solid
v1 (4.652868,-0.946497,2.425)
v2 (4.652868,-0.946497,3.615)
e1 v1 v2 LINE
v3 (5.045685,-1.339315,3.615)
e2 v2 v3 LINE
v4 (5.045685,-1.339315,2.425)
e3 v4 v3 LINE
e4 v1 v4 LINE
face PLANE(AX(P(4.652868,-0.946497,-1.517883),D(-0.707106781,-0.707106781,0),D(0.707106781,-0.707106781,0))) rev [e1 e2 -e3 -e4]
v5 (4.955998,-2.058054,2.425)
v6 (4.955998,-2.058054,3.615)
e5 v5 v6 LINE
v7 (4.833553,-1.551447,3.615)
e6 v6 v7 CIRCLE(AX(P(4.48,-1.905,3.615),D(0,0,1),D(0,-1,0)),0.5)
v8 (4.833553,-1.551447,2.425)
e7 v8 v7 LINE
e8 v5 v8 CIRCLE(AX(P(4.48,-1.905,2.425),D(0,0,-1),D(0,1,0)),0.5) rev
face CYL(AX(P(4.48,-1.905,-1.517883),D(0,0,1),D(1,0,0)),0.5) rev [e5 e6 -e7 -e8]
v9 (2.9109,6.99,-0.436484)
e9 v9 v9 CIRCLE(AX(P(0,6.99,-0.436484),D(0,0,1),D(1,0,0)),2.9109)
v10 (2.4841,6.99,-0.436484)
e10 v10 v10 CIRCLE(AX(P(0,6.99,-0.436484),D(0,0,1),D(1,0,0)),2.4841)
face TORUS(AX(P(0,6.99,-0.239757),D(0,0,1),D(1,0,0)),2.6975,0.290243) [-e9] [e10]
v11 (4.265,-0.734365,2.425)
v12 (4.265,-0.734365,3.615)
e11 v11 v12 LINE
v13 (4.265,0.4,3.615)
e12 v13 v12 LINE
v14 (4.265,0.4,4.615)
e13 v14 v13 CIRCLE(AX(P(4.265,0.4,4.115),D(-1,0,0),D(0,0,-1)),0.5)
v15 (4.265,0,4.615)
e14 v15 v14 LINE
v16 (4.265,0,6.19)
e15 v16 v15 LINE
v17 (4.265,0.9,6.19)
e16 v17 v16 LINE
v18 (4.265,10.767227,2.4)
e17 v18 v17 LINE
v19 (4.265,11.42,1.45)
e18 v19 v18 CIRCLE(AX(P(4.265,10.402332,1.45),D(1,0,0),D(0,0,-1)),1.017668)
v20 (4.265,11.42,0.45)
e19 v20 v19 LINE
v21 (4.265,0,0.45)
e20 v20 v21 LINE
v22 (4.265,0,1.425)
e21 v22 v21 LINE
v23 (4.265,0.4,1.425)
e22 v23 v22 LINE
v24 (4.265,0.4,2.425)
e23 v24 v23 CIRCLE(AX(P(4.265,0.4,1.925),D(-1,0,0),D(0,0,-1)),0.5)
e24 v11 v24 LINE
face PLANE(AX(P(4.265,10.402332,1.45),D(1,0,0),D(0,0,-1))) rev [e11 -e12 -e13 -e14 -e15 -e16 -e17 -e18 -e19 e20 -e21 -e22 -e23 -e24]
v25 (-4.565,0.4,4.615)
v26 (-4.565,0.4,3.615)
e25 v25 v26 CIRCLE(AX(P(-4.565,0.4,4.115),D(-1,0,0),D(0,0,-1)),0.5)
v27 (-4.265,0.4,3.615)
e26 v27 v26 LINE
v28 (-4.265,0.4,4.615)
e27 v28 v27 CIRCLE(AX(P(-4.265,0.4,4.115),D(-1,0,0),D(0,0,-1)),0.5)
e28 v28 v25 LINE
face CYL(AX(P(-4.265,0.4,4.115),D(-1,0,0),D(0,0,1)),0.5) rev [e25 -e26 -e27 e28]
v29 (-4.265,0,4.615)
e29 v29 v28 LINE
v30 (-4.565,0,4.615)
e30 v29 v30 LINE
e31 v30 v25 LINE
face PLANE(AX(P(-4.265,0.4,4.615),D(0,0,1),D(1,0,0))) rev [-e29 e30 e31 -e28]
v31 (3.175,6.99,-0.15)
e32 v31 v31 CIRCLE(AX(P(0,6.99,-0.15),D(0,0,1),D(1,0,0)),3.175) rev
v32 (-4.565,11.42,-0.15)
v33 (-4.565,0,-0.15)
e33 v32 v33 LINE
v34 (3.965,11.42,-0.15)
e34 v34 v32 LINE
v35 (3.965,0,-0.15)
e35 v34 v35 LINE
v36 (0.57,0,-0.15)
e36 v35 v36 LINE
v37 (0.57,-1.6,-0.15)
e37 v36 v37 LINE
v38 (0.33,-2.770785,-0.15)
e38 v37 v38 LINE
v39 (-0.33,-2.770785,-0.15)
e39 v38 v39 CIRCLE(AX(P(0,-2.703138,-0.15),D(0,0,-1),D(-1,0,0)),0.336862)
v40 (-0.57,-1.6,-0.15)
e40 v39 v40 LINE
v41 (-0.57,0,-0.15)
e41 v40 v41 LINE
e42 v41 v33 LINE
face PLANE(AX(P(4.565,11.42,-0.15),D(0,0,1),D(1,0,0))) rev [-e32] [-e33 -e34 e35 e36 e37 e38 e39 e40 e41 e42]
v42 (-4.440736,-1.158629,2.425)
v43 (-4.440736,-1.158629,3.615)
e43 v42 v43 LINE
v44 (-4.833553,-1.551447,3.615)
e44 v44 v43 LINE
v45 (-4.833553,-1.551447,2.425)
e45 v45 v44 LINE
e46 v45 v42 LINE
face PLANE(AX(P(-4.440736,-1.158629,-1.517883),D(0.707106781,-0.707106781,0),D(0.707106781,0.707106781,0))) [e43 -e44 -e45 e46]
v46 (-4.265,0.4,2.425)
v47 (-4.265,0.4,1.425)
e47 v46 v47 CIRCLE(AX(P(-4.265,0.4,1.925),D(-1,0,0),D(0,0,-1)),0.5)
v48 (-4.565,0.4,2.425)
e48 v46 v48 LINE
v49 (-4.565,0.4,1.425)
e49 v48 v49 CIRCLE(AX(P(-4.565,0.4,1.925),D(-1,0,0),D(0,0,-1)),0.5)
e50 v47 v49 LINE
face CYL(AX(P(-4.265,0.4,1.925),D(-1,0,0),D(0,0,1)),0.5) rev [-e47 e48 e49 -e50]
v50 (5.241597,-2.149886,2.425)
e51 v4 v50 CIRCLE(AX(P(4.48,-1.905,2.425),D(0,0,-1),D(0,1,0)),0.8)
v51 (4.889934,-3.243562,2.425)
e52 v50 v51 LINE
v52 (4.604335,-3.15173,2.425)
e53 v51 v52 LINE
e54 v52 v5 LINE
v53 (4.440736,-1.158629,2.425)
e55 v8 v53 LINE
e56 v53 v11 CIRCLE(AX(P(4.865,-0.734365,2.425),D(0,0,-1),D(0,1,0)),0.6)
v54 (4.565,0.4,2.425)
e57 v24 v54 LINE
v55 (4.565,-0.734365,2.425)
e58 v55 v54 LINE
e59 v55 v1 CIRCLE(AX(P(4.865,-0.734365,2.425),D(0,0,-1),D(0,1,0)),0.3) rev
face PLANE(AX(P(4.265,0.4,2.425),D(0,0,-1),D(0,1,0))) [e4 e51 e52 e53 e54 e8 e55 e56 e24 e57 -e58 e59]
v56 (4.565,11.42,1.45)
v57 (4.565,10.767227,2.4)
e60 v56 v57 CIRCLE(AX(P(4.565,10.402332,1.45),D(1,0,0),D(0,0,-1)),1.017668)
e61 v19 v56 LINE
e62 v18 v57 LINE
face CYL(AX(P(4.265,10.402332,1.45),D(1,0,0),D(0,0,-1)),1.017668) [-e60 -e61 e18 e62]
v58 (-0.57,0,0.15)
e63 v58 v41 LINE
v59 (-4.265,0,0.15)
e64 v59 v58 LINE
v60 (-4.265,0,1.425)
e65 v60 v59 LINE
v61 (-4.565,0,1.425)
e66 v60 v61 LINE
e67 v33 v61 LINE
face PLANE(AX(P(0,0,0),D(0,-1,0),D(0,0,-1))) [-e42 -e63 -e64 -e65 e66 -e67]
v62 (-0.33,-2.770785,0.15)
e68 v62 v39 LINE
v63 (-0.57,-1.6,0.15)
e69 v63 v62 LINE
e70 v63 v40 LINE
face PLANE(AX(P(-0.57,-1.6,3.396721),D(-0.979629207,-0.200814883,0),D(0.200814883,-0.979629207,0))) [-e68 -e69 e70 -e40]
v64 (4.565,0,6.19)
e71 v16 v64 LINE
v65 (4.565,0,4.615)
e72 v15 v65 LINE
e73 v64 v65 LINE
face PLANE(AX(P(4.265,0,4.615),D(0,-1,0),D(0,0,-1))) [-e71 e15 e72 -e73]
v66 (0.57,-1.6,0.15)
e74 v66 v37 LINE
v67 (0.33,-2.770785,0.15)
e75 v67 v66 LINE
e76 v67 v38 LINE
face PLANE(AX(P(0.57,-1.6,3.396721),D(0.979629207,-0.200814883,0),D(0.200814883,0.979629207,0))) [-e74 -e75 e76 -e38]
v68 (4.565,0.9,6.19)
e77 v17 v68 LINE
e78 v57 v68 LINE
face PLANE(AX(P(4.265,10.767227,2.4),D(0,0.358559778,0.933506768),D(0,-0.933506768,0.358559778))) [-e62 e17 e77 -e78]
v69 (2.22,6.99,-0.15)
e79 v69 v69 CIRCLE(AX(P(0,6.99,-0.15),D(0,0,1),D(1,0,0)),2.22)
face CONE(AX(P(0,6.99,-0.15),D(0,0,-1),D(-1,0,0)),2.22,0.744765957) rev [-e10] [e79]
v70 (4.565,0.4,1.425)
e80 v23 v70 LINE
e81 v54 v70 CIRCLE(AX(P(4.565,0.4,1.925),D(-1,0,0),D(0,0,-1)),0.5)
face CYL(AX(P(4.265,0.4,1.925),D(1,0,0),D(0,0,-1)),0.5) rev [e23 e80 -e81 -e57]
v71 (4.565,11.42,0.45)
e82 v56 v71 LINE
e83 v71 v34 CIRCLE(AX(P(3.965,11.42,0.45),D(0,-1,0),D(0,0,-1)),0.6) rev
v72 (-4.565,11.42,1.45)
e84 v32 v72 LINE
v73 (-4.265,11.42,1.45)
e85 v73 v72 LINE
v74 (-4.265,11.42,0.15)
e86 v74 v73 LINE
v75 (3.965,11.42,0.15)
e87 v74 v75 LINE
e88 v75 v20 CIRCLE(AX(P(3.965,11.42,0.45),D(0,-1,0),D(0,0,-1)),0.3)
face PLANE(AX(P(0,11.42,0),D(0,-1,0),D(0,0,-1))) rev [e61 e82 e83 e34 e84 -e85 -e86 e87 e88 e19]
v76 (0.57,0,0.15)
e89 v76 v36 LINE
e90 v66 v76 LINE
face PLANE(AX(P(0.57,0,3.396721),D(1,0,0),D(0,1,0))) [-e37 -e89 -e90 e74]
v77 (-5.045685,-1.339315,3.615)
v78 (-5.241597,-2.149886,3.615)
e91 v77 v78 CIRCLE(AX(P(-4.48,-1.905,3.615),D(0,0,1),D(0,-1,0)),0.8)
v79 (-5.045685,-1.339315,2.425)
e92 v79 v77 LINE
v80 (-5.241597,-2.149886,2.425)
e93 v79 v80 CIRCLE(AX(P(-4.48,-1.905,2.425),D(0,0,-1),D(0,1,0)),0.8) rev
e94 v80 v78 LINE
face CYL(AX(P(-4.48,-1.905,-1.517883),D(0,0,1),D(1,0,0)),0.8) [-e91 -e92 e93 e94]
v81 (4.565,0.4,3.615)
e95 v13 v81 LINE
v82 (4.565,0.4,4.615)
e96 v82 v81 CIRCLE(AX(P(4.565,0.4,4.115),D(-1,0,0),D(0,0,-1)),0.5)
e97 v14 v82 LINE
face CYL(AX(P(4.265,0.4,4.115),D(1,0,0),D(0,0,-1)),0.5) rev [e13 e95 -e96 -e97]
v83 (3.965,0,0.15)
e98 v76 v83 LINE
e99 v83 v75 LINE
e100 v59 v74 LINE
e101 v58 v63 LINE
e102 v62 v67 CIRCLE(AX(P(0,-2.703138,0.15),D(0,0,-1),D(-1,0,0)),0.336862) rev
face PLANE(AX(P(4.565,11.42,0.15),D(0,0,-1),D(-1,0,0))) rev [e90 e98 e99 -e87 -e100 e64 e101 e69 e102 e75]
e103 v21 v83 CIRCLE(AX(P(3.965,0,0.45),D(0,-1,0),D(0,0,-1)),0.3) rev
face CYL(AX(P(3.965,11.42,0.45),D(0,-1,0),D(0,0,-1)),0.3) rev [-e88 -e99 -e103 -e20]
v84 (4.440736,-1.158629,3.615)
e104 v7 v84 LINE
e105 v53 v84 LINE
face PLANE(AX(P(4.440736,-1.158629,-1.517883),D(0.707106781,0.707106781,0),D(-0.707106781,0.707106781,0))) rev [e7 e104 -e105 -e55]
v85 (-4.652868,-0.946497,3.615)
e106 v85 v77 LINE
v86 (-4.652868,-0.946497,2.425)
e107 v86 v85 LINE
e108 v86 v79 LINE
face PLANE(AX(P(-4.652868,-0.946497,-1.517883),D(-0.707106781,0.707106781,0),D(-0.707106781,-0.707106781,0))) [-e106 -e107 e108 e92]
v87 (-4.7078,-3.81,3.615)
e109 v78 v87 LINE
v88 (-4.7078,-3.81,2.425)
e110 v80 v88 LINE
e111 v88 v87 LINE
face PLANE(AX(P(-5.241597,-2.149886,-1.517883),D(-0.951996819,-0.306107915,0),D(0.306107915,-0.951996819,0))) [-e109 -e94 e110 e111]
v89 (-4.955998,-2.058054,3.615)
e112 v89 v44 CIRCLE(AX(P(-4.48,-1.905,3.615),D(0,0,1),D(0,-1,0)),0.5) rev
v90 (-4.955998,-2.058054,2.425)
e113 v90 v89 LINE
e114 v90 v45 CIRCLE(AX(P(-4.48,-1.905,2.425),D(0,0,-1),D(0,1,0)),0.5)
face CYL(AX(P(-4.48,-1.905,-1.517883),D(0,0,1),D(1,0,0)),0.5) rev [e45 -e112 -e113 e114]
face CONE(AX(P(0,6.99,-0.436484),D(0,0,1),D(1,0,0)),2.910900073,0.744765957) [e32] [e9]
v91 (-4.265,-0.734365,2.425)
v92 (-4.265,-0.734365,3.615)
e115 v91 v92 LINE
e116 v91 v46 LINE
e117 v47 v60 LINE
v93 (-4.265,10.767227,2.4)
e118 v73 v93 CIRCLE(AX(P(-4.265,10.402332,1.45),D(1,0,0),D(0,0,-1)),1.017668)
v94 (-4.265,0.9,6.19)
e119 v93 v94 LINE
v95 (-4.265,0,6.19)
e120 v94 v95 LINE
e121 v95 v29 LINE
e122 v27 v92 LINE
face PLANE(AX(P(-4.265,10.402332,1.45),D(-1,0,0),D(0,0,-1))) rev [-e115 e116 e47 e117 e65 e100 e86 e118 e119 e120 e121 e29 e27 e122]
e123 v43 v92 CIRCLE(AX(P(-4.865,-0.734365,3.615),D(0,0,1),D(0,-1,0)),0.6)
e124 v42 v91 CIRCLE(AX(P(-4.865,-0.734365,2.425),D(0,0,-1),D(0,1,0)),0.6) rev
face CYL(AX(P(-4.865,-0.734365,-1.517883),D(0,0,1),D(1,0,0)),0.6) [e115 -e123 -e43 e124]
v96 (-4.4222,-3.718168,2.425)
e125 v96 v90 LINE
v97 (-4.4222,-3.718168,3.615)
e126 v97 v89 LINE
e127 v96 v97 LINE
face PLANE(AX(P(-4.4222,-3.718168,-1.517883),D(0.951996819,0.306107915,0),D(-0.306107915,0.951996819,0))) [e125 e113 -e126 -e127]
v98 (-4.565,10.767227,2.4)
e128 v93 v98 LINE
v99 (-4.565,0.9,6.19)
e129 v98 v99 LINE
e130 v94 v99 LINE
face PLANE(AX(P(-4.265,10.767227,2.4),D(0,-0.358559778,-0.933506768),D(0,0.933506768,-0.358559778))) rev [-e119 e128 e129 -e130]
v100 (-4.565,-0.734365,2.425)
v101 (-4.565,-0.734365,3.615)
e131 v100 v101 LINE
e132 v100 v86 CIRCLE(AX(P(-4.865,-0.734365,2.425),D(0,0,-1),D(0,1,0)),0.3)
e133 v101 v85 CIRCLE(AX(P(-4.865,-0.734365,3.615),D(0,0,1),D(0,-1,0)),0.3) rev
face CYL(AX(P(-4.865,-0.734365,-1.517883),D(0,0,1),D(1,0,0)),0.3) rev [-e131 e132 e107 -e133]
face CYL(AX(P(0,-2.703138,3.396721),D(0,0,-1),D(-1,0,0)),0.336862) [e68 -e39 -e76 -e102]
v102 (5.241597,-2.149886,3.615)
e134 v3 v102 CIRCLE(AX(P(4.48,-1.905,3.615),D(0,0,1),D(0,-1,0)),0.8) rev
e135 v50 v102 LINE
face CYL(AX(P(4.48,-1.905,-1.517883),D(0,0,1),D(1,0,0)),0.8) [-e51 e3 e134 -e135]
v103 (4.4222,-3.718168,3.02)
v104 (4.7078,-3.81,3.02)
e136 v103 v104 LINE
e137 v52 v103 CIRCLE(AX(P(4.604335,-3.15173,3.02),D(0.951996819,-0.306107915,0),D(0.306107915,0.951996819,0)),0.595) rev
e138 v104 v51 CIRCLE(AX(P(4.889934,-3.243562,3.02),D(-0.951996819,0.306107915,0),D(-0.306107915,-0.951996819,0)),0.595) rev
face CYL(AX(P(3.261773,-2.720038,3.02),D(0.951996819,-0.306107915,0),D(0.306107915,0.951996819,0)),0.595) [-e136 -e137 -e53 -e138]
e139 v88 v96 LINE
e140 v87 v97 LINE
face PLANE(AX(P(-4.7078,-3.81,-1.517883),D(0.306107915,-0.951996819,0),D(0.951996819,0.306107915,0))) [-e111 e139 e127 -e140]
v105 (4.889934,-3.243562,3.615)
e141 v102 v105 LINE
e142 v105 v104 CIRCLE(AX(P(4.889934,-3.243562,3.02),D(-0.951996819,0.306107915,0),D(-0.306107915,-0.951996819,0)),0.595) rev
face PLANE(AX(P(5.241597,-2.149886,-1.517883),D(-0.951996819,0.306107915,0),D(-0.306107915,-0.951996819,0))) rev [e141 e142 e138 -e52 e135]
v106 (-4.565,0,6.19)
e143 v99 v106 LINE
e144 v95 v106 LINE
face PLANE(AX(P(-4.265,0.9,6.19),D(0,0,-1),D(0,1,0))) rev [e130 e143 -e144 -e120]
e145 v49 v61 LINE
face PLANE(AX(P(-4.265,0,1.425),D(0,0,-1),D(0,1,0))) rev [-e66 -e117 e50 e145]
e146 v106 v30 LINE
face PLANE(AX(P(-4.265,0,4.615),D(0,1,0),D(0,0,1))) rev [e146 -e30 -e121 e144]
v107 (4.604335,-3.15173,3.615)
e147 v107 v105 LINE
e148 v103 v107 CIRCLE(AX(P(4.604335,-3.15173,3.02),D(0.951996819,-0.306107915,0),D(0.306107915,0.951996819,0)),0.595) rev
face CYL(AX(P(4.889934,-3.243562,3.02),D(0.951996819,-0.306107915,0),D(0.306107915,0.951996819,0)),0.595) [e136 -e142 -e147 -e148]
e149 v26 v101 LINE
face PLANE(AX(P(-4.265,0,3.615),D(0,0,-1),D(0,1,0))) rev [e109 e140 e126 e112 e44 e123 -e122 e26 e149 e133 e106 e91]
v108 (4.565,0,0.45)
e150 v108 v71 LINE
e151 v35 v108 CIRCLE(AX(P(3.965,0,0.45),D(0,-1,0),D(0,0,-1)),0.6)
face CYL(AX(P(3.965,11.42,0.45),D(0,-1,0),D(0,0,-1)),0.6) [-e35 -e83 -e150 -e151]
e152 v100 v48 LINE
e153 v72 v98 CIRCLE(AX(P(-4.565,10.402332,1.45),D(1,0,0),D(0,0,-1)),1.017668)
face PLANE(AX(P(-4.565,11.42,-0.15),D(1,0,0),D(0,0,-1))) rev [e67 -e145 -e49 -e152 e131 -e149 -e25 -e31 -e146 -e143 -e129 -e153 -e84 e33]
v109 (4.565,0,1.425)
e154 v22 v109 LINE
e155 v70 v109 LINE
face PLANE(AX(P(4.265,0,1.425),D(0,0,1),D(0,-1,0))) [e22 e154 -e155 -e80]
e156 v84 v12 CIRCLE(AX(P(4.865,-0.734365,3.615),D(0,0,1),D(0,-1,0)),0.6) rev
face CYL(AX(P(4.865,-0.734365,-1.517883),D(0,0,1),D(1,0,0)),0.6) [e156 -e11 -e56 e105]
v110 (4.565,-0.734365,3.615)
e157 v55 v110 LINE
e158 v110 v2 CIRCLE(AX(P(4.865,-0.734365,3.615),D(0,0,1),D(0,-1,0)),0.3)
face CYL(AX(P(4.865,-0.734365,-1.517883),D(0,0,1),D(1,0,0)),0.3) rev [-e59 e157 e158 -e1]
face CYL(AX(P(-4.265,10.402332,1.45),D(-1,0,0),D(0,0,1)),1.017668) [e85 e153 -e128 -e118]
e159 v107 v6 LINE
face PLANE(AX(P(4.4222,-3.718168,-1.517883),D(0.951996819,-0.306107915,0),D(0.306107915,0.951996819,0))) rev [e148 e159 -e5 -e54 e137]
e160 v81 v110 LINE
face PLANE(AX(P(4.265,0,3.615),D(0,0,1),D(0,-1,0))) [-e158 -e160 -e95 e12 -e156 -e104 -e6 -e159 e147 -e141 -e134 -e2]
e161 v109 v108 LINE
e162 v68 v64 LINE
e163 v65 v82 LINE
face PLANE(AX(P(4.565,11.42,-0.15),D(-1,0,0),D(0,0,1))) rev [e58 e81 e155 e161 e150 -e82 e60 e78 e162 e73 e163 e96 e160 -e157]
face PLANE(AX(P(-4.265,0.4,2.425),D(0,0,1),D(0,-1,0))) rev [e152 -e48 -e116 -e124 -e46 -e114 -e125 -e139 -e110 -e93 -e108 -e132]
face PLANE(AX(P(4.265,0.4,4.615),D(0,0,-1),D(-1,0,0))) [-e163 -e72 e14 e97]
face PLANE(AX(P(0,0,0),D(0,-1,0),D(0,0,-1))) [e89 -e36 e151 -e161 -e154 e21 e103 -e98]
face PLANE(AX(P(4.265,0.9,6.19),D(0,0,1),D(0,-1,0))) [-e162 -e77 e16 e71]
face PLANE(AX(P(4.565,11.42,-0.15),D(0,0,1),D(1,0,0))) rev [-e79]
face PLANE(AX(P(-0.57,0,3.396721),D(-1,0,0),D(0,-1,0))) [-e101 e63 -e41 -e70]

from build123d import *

# Parameters (mm, degrees)
SKETCH1_W                       = 9.13
SKETCH1_H                       = 0.3
BOSS_EXTRUDE1_DEPTH             = 11.42
BOSS_EXTRUDE3_DEPTH             = 0.3
BOSS_EXTRUDE4_DEPTH             = 0.3
FILLET2_R                       = 0.3
FILLET3_R                       = 0.6
BOSS_EXTRUDE5_REACH             = 14.701
BOSS_EXTRUDE5_DIRECTION_2_REACH = 14.701
FILLET4_R                       = 0.595


with BuildPart() as part:
    # Sketch1 → Boss-Extrude1 (new body)
    with BuildSketch(Plane(origin=(0, 0, 0), x_dir=(1, 0, 0), z_dir=(0, 1, 0))):
        Rectangle(SKETCH1_W, SKETCH1_H)
    extrude(amount=BOSS_EXTRUDE1_DEPTH)

    # Sketch3 → Boss-Extrude3 (add)
    with BuildSketch(Plane(origin=(0, 0, -0.15), x_dir=(-1, 0, 0), z_dir=(0, 0, -1))):
        with BuildLine():
            Line((-0.57, 0), (0.57, 0))
            Line((0.57, 0), (0.57, -1.6))
            Line((0.57, -1.6), (0.33, -2.770784784))
            ThreePointArc((0.33, -2.770784784), (0, -3.04), (-0.33, -2.770784784))
            Line((-0.33, -2.770784784), (-0.57, -1.6))
            Line((-0.57, -1.6), (-0.57, 0))
        make_face()
    extrude(amount=-BOSS_EXTRUDE3_DEPTH)

    # Sketch4 → Boss-Extrude4 (add)
    with BuildSketch(Plane(origin=(4.565, 0, 0), x_dir=(0, 0, -1), z_dir=(1, 0, 0))):
        with BuildLine():
            Line((-0.15, 11.42), (-0.15, 0))
            Line((-0.15, 0), (-1.425, 0))
            Line((-1.425, 0), (-1.425, 0.4))
            ThreePointArc((-1.425, 0.4), (-1.925, 0.9), (-2.425, 0.4))
            Line((-2.425, 0.4), (-2.425, 0))
            Line((-2.425, 0), (-3.615, 0))
            Line((-3.615, 0), (-3.615, 0.4))
            ThreePointArc((-3.615, 0.4), (-4.115, 0.9), (-4.615, 0.4))
            Line((-4.615, 0.4), (-4.615, 0))
            Line((-4.615, 0), (-6.19, 0))
            Line((-6.19, 0), (-6.19, 0.9))
            Line((-6.19, 0.9), (-2.4, 10.767226789))
            ThreePointArc((-2.4, 10.767226789), (-2.026327352, 11.241078061), (-1.45, 11.42))
            Line((-1.45, 11.42), (-0.15, 11.42))
        make_face()
    boss_extrude4 = extrude(amount=-BOSS_EXTRUDE4_DEPTH)

    # Fillet2
    fillet2_edges = [part.edges().sort_by_distance(p)[0] for p in [
        (4.265, 5.71, 0.15),
    ]]
    fillet(fillet2_edges, radius=FILLET2_R)

    # Fillet3
    fillet3_edges = [part.edges().sort_by_distance(p)[0] for p in [
        (4.565, 5.71, -0.15),
    ]]
    fillet(fillet3_edges, radius=FILLET3_R)

    # Boss-Extrude5: up to this face of the body (flat: up to its plane)
    boss_extrude5_end = Plane(part.part.faces().sort_by_distance((4.415, 0.2, 2.425))[0])
    # Sketch5 → Boss-Extrude5 (add, up to the picked face)
    with BuildSketch(Plane(origin=(0, 0, 3.02), x_dir=(-1, 0, 0), z_dir=(0, 0, -1)), mode=Mode.PRIVATE) as boss_extrude5_sk1:
        with BuildLine():
            Line((-4.565, 0), (-4.265, 0))
            Line((-4.265, 0), (-4.265, -0.734365081))
            ThreePointArc((-4.265, -0.734365081), (-4.31067228, -0.963975141), (-4.440735931, -1.15862915))
            Line((-4.440735931, -1.15862915), (-4.833553391, -1.551446609))
            ThreePointArc((-4.833553391, -1.551446609), (-4.966005966, -1.787534255), (-4.95599841, -2.058053958))
            Line((-4.95599841, -2.058053958), (-4.422200477, -3.718167625))
            Line((-4.422200477, -3.718167625), (-4.707799523, -3.81))
            Line((-4.707799523, -3.81), (-5.241597456, -2.149886332))
            ThreePointArc((-5.241597456, -2.149886332), (-5.257609545, -1.717054807), (-5.045685425, -1.339314575))
            Line((-5.045685425, -1.339314575), (-4.652867966, -0.946497116))
            ThreePointArc((-4.652867966, -0.946497116), (-4.58783614, -0.849170111), (-4.565, -0.734365081))
            Line((-4.565, -0.734365081), (-4.565, 0))
        make_face()
    boss_extrude5_tool1 = split(extrude(boss_extrude5_sk1.sketch, amount=BOSS_EXTRUDE5_REACH, mode=Mode.PRIVATE), bisect_by=boss_extrude5_end, keep=Keep.BOTH, mode=Mode.PRIVATE)
    boss_extrude5 = boss_extrude5_tool1.solids().sort_by(Axis((4.415, -0.039429, 3.02), (0, 0, -1)))[0]
    add(boss_extrude5)

    # Boss-Extrude5 direction 2: up to this face of the body (flat: up to its plane)
    boss_extrude5_direction_2_end = Plane(part.part.faces().sort_by_distance((4.415, 0.2, 3.615))[0])
    # Sketch5 → Boss-Extrude5 direction 2 (add, up to the picked face)
    with BuildSketch(Plane(origin=(0, 0, 3.02), x_dir=(-1, 0, 0), z_dir=(0, 0, -1)), mode=Mode.PRIVATE) as boss_extrude5_direction_2_sk1:
        with BuildLine():
            Line((-4.565, 0), (-4.265, 0))
            Line((-4.265, 0), (-4.265, -0.734365081))
            ThreePointArc((-4.265, -0.734365081), (-4.31067228, -0.963975141), (-4.440735931, -1.15862915))
            Line((-4.440735931, -1.15862915), (-4.833553391, -1.551446609))
            ThreePointArc((-4.833553391, -1.551446609), (-4.966005966, -1.787534255), (-4.95599841, -2.058053958))
            Line((-4.95599841, -2.058053958), (-4.422200477, -3.718167625))
            Line((-4.422200477, -3.718167625), (-4.707799523, -3.81))
            Line((-4.707799523, -3.81), (-5.241597456, -2.149886332))
            ThreePointArc((-5.241597456, -2.149886332), (-5.257609545, -1.717054807), (-5.045685425, -1.339314575))
            Line((-5.045685425, -1.339314575), (-4.652867966, -0.946497116))
            ThreePointArc((-4.652867966, -0.946497116), (-4.58783614, -0.849170111), (-4.565, -0.734365081))
            Line((-4.565, -0.734365081), (-4.565, 0))
        make_face()
    boss_extrude5_direction_2_tool1 = split(extrude(boss_extrude5_direction_2_sk1.sketch, amount=-BOSS_EXTRUDE5_DIRECTION_2_REACH, mode=Mode.PRIVATE), bisect_by=boss_extrude5_direction_2_end, keep=Keep.BOTH, mode=Mode.PRIVATE)
    boss_extrude5_direction_2 = boss_extrude5_direction_2_tool1.solids().sort_by(Axis((4.415, -0.039429, 3.02), (0, 0, 1)))[0]
    add(boss_extrude5_direction_2)

    # Fillet4
    fillet4_edges = [part.edges().sort_by_distance(p)[0] for p in [
        (4.565, -3.764083813, 2.425),
        (4.565, -3.764083813, 3.615),
    ]]
    fillet(fillet4_edges, radius=FILLET4_R - 0.0001)  # a hair under: the kernel refuses the full size

    # Mirror1: Boss-Extrude4, Boss-Extrude5, Boss-Extrude5 direction 2 across plane
    add(boss_extrude4.mirror(Plane(origin=(0, 0, 0), x_dir=(0, 0, 1), z_dir=(1, 0, 0))))
    add(boss_extrude5.mirror(Plane(origin=(0, 0, 0), x_dir=(0, 0, 1), z_dir=(1, 0, 0))))
    add(boss_extrude5_direction_2.mirror(Plane(origin=(0, 0, 0), x_dir=(0, 0, 1), z_dir=(1, 0, 0))))

    # Sketch7 → Revolve2 (revolve)
    with BuildSketch(Plane(origin=(0, 0, 0), x_dir=(0, 0, -1), z_dir=(1, 0, 0)), mode=Mode.PRIVATE) as revolve2_sk:
        with BuildLine():
            Line((0.15, 9.21), (0.436483674, 9.474099927))
            ThreePointArc((0.436483674, 9.474099927), (0.53, 9.6875), (0.436483674, 9.900900073))
            Line((0.436483674, 9.900900073), (0.15, 10.165))
            Line((0.15, 10.165), (0.15, 9.21))
        make_face()
    revolve(revolve2_sk.sketch.rotate(Axis((0, 6.99, -0.15), (0, 0, -1)), 90), axis=Axis((0, 6.99, -0.15), (0, 0, -1)))


solid = part.part
